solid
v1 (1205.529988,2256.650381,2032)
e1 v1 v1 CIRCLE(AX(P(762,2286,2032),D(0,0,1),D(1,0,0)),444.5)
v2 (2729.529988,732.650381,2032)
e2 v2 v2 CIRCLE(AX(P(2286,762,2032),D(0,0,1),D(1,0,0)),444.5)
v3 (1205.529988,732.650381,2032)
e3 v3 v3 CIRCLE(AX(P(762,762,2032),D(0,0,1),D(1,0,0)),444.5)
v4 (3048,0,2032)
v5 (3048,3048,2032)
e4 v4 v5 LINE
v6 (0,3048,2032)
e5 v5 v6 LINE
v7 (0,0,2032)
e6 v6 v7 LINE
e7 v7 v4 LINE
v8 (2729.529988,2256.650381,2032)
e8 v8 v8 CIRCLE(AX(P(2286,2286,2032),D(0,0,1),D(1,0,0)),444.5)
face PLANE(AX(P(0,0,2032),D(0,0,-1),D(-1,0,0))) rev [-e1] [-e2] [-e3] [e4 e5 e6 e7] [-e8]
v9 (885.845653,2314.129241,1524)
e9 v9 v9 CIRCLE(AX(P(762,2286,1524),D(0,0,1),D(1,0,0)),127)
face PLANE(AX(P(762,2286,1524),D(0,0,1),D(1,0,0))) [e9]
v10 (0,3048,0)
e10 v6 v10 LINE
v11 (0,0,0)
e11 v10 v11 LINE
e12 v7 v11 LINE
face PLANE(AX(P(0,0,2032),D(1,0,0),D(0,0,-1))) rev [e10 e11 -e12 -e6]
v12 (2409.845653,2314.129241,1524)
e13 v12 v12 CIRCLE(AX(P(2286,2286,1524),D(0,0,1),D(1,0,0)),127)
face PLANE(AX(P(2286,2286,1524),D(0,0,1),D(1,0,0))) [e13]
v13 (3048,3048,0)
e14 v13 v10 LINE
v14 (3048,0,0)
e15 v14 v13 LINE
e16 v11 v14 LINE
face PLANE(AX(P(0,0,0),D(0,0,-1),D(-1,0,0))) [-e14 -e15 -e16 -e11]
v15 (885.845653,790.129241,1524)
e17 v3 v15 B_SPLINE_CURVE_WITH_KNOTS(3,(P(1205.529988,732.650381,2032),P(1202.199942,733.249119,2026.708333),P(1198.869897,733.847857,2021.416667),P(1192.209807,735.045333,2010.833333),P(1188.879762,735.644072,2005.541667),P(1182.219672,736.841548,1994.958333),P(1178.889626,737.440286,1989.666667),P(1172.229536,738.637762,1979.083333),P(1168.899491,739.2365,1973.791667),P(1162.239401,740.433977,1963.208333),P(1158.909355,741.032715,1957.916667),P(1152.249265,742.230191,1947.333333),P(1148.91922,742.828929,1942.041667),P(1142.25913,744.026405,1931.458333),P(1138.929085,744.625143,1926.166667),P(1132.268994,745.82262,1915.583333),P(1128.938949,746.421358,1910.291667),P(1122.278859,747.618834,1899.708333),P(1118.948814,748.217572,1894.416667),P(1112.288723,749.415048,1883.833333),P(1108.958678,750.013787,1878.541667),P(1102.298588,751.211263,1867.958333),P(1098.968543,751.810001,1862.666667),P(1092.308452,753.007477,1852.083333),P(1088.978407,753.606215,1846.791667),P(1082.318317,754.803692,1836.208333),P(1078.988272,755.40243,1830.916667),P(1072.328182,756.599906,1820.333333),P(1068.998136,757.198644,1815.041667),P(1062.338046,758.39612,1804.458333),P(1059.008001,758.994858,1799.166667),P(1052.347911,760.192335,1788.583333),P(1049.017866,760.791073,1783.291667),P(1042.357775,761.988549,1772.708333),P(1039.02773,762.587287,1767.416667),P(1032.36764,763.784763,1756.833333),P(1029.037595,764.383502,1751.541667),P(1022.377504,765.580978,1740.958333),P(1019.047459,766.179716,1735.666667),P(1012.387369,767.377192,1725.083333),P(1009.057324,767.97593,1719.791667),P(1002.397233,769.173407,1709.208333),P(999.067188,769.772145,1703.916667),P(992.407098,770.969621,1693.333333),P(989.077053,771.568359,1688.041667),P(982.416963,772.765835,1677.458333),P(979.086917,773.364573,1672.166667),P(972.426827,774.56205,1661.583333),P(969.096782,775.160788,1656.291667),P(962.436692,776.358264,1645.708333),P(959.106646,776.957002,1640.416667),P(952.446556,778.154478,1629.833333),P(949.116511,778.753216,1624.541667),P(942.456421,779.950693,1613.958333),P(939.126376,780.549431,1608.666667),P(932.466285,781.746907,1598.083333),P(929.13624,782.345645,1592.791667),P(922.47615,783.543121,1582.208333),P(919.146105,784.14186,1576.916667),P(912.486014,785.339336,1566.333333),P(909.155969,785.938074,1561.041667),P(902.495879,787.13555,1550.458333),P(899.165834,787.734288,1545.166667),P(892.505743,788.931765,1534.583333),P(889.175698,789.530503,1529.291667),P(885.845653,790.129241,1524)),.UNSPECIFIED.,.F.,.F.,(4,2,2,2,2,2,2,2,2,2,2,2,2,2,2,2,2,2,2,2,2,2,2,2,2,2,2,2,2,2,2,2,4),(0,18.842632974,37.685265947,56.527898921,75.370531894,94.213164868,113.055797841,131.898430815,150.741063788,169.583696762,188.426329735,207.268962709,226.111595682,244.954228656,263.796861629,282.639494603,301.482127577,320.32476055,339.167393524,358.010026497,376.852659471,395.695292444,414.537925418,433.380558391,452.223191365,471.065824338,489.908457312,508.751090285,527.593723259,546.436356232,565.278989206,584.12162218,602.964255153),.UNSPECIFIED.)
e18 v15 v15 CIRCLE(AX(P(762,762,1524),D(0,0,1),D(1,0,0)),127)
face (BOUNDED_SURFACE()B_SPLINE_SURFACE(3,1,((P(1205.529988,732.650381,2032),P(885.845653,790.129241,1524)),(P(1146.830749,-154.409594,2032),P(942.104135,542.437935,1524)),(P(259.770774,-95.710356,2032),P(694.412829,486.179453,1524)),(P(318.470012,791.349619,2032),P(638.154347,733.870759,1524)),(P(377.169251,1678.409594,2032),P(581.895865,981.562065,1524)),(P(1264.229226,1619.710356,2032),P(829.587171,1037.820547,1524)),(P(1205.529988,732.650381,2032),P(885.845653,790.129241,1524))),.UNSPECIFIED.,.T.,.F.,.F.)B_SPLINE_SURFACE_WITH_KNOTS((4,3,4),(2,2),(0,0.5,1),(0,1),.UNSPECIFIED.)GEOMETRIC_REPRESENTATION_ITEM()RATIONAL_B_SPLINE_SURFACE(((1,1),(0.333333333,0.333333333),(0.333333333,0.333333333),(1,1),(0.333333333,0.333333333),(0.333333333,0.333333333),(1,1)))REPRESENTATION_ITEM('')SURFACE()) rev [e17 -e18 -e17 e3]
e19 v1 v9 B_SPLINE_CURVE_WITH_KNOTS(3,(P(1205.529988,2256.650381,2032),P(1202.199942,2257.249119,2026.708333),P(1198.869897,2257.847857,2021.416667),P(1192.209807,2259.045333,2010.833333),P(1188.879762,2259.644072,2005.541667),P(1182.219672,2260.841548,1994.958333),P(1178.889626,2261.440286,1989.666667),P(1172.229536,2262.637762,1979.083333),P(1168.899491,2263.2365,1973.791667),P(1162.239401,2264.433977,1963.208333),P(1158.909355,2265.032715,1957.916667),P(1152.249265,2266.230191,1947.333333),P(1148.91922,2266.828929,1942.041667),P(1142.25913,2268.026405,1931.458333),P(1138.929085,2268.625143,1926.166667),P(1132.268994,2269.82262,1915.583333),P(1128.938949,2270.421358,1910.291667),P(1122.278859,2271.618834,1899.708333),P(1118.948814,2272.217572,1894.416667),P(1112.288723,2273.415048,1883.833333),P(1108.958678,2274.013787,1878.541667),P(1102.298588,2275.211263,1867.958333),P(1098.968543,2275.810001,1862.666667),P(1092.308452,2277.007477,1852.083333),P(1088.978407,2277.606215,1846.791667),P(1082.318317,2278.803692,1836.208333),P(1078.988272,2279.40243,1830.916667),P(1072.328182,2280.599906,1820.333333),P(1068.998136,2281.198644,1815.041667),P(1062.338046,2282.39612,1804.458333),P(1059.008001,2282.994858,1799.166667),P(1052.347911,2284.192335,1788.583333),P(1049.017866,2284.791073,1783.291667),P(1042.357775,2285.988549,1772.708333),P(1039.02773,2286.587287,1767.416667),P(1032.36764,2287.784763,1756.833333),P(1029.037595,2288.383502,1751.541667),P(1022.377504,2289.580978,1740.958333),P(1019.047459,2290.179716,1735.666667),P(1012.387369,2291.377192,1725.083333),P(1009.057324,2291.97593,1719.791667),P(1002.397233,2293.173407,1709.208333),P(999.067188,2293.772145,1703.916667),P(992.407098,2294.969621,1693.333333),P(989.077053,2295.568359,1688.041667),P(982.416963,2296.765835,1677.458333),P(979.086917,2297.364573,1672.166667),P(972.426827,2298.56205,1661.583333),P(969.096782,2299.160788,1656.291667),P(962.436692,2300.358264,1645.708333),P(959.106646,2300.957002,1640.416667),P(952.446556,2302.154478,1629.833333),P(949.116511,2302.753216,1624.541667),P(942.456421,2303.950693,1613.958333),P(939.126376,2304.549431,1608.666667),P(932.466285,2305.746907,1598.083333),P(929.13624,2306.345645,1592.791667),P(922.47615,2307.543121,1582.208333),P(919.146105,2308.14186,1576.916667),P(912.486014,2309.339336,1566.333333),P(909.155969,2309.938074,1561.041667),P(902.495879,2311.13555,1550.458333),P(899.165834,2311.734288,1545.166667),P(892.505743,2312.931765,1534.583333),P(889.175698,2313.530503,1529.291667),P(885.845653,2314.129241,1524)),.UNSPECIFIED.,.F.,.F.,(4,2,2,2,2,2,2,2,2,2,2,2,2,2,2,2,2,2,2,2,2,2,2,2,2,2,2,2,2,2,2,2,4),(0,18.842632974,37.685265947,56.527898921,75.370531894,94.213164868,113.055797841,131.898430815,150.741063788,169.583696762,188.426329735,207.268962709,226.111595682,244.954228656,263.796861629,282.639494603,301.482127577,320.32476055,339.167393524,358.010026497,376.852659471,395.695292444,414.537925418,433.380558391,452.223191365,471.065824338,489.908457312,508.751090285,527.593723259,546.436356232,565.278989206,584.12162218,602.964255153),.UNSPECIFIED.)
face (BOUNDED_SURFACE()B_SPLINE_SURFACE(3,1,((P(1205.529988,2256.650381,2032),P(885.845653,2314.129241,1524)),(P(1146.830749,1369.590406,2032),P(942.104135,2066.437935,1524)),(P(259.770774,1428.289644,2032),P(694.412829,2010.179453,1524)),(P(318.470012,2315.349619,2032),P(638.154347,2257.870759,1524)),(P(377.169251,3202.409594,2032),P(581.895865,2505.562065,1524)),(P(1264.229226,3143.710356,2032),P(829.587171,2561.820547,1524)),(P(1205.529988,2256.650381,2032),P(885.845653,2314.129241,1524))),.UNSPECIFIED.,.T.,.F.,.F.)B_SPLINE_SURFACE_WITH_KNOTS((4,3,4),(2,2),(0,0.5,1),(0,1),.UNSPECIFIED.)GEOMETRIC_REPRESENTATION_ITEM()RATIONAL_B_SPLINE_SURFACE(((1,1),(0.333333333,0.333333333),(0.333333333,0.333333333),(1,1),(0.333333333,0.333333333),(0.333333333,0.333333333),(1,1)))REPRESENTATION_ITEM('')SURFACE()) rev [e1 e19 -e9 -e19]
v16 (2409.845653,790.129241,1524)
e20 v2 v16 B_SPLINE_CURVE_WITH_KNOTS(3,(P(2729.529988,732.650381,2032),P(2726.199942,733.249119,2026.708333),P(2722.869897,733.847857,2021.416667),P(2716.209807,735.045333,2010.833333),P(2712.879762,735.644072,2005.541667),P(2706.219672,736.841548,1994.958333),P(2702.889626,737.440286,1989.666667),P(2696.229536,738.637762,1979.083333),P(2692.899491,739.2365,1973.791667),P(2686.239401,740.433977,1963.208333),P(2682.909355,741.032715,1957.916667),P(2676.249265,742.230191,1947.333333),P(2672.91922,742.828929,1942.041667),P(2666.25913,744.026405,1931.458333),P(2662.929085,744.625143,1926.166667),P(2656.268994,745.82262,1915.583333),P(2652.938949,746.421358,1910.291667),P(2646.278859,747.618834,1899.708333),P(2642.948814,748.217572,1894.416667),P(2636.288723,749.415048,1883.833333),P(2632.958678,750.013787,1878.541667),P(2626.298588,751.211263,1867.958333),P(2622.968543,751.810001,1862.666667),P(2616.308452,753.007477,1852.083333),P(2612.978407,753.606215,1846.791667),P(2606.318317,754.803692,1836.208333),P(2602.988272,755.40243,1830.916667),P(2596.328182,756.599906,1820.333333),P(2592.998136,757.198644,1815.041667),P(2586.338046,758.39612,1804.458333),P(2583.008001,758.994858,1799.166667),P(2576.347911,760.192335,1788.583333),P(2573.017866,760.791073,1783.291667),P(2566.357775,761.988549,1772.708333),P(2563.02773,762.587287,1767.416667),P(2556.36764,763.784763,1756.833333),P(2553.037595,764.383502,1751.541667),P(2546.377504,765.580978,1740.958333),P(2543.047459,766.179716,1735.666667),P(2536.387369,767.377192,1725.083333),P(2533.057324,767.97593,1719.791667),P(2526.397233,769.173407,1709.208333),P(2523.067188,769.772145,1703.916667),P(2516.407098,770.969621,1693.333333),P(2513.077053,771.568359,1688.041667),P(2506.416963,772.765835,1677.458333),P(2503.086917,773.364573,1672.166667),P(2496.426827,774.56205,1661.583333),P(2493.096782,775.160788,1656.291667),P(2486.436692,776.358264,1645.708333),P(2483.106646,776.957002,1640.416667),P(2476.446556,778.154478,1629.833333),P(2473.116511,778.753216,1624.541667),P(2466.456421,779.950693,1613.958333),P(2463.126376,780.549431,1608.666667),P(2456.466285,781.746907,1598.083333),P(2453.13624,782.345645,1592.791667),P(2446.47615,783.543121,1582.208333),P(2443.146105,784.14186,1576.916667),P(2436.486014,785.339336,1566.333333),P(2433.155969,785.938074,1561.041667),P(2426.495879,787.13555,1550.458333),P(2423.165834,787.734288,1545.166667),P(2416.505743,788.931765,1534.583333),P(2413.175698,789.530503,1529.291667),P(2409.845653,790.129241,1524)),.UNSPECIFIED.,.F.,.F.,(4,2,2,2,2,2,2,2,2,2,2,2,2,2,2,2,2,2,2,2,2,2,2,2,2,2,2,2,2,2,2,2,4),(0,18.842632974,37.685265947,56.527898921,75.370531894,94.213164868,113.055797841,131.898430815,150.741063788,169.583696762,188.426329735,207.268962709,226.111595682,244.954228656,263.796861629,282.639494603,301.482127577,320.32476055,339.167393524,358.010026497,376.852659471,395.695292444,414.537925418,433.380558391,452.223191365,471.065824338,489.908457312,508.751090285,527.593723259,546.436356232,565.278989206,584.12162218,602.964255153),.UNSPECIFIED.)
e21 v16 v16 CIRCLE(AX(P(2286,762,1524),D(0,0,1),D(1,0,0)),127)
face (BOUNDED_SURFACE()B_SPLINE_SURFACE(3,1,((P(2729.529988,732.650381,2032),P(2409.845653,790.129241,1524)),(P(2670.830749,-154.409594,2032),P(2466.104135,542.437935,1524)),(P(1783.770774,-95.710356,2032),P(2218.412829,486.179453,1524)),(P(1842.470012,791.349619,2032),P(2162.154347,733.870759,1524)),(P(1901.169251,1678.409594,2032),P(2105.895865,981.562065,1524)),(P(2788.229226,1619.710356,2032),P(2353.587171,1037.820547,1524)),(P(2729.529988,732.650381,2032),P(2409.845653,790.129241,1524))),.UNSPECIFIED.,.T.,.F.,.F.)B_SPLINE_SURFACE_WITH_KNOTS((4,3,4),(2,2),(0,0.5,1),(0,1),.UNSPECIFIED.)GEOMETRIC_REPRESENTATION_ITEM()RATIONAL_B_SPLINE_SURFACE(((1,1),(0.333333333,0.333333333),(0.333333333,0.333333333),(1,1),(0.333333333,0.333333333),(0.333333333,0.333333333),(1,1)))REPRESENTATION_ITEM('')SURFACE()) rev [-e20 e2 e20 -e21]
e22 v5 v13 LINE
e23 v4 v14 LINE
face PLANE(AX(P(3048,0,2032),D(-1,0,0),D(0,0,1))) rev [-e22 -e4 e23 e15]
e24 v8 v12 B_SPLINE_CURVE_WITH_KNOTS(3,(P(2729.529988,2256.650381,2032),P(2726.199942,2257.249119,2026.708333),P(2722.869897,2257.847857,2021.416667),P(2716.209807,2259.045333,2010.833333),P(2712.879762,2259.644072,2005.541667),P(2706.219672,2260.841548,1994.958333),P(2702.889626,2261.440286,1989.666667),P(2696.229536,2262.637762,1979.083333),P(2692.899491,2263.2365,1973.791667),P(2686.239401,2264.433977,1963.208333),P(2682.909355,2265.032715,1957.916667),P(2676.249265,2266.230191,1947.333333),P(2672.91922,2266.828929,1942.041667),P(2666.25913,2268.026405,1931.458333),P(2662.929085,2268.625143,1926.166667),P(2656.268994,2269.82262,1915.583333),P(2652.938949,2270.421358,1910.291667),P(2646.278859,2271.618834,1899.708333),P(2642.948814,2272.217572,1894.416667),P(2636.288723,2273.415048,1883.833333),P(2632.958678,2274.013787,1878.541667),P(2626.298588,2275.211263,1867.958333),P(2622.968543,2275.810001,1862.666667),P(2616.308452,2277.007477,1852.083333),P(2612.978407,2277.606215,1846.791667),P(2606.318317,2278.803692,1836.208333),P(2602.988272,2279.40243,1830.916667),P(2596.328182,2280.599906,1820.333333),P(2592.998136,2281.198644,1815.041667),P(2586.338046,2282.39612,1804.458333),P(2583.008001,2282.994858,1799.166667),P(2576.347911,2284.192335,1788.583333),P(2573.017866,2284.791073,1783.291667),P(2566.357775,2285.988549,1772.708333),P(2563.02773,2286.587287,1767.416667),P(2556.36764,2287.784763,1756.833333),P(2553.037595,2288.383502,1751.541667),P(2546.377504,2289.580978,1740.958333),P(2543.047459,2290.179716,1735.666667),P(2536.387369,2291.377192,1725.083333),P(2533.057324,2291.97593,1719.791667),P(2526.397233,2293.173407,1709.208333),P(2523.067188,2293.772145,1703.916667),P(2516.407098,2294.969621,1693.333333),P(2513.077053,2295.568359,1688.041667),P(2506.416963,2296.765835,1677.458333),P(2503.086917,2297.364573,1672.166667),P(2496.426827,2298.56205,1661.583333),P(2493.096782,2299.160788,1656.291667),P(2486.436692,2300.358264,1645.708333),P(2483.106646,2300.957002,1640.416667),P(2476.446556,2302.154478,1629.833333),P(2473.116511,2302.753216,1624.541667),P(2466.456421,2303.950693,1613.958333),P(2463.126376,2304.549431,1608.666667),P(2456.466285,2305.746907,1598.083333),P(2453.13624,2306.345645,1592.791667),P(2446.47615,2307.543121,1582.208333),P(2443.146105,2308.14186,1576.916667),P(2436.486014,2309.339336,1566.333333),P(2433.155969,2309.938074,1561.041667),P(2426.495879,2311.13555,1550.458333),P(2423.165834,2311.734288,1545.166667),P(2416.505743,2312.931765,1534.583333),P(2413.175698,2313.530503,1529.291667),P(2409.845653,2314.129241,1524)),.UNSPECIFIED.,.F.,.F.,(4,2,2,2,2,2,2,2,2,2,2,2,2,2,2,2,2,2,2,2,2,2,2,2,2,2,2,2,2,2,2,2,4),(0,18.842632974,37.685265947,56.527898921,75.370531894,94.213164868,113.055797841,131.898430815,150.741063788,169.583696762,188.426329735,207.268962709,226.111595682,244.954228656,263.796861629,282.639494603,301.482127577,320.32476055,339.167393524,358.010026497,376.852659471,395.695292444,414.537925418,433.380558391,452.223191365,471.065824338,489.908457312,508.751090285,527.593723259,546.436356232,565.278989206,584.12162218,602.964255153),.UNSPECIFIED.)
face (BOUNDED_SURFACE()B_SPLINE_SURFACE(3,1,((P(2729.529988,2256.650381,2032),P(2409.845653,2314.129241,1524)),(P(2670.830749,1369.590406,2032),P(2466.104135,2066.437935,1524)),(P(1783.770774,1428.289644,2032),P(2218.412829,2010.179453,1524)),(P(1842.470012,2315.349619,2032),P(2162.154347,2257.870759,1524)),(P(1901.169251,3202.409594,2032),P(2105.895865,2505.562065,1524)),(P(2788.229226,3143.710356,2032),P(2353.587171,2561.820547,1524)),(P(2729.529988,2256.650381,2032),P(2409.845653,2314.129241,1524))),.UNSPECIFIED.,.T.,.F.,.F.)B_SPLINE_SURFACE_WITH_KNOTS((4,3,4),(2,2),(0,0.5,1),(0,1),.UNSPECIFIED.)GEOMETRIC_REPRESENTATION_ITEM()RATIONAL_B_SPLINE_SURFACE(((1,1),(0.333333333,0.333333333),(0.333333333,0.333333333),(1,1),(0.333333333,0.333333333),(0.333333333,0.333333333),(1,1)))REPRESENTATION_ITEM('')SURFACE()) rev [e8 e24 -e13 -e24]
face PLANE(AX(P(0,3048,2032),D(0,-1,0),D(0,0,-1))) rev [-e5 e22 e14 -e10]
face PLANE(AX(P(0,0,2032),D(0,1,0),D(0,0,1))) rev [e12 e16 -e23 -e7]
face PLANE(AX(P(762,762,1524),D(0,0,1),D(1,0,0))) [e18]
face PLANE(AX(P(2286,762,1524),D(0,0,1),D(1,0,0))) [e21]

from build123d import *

# Parameters (mm, degrees)
SKETCH1_W            = 3048
SKETCH1_H            = 3048
BOSS_EXTRUDE1_DEPTH  = 2032
LPATTERN1_COUNT      = 2
LPATTERN1_PITCH      = 1524
LPATTERN1_COUNT_DIR2 = 2
LPATTERN1_PITCH_DIR2 = 1524


with BuildPart() as part:
    # Sketch1 → Boss-Extrude1 (new body)
    with BuildSketch(Plane.XY):
        with Locations((1524, 1524)):
            Rectangle(SKETCH1_W, SKETCH1_H)
    extrude(amount=BOSS_EXTRUDE1_DEPTH)

    # Cut-Loft1: read off the stored shape, not the designer's step
    # Cut-Loft1: loft between two sections, ruled curve by curve
    cut_loft1_from = [
        Edge.make_bspline([(1205.529987554, 2256.650380911, 2032), (1146.830749375, 1369.590405804, 2032), (259.770774268, 1428.289643982, 2032), (318.470012446, 2315.349619089, 2032), (377.169250625, 3202.409594196, 2032), (1264.229225732, 3143.710356018, 2032), (1205.529987554, 2256.650380911, 2032)], [0, 0, 0, 0, 0.5, 0.5, 0.5, 1, 1, 1, 1], 3, [1, 0.333333333, 0.333333333, 1, 0.333333333, 0.333333333, 1]),
    ]
    cut_loft1_to = [
        Edge.make_bspline([(885.845653168, 2314.129240859, 1524), (942.104134886, 2066.437934522, 1524), (694.412828549, 2010.179452804, 1524), (638.154346832, 2257.870759141, 1524), (581.895865114, 2505.562065478, 1524), (829.587171451, 2561.820547196, 1524), (885.845653168, 2314.129240859, 1524)], [0, 0, 0, 0, 0.5, 0.5, 0.5, 1, 1, 1, 1], 3, [1, 0.333333333, 0.333333333, 1, 0.333333333, 0.333333333, 1]),
    ]
    cut_loft1 = Solid(Shell([*[Face.make_surface_from_curves(cut_loft1_from[k], cut_loft1_to[k]) for k in range(1)], Face(Wire(cut_loft1_from)), Face(Wire(cut_loft1_to))]))
    add(cut_loft1, mode=Mode.SUBTRACT)

    # LPattern1: Cut-Loft1 2 × 2
    with Locations(*[(i * LPATTERN1_PITCH, -j * LPATTERN1_PITCH_DIR2, 0) for i in range(LPATTERN1_COUNT) for j in range(LPATTERN1_COUNT_DIR2) if (i, j) != (0, 0)]):
        add(cut_loft1, mode=Mode.SUBTRACT)


solid = part.part
